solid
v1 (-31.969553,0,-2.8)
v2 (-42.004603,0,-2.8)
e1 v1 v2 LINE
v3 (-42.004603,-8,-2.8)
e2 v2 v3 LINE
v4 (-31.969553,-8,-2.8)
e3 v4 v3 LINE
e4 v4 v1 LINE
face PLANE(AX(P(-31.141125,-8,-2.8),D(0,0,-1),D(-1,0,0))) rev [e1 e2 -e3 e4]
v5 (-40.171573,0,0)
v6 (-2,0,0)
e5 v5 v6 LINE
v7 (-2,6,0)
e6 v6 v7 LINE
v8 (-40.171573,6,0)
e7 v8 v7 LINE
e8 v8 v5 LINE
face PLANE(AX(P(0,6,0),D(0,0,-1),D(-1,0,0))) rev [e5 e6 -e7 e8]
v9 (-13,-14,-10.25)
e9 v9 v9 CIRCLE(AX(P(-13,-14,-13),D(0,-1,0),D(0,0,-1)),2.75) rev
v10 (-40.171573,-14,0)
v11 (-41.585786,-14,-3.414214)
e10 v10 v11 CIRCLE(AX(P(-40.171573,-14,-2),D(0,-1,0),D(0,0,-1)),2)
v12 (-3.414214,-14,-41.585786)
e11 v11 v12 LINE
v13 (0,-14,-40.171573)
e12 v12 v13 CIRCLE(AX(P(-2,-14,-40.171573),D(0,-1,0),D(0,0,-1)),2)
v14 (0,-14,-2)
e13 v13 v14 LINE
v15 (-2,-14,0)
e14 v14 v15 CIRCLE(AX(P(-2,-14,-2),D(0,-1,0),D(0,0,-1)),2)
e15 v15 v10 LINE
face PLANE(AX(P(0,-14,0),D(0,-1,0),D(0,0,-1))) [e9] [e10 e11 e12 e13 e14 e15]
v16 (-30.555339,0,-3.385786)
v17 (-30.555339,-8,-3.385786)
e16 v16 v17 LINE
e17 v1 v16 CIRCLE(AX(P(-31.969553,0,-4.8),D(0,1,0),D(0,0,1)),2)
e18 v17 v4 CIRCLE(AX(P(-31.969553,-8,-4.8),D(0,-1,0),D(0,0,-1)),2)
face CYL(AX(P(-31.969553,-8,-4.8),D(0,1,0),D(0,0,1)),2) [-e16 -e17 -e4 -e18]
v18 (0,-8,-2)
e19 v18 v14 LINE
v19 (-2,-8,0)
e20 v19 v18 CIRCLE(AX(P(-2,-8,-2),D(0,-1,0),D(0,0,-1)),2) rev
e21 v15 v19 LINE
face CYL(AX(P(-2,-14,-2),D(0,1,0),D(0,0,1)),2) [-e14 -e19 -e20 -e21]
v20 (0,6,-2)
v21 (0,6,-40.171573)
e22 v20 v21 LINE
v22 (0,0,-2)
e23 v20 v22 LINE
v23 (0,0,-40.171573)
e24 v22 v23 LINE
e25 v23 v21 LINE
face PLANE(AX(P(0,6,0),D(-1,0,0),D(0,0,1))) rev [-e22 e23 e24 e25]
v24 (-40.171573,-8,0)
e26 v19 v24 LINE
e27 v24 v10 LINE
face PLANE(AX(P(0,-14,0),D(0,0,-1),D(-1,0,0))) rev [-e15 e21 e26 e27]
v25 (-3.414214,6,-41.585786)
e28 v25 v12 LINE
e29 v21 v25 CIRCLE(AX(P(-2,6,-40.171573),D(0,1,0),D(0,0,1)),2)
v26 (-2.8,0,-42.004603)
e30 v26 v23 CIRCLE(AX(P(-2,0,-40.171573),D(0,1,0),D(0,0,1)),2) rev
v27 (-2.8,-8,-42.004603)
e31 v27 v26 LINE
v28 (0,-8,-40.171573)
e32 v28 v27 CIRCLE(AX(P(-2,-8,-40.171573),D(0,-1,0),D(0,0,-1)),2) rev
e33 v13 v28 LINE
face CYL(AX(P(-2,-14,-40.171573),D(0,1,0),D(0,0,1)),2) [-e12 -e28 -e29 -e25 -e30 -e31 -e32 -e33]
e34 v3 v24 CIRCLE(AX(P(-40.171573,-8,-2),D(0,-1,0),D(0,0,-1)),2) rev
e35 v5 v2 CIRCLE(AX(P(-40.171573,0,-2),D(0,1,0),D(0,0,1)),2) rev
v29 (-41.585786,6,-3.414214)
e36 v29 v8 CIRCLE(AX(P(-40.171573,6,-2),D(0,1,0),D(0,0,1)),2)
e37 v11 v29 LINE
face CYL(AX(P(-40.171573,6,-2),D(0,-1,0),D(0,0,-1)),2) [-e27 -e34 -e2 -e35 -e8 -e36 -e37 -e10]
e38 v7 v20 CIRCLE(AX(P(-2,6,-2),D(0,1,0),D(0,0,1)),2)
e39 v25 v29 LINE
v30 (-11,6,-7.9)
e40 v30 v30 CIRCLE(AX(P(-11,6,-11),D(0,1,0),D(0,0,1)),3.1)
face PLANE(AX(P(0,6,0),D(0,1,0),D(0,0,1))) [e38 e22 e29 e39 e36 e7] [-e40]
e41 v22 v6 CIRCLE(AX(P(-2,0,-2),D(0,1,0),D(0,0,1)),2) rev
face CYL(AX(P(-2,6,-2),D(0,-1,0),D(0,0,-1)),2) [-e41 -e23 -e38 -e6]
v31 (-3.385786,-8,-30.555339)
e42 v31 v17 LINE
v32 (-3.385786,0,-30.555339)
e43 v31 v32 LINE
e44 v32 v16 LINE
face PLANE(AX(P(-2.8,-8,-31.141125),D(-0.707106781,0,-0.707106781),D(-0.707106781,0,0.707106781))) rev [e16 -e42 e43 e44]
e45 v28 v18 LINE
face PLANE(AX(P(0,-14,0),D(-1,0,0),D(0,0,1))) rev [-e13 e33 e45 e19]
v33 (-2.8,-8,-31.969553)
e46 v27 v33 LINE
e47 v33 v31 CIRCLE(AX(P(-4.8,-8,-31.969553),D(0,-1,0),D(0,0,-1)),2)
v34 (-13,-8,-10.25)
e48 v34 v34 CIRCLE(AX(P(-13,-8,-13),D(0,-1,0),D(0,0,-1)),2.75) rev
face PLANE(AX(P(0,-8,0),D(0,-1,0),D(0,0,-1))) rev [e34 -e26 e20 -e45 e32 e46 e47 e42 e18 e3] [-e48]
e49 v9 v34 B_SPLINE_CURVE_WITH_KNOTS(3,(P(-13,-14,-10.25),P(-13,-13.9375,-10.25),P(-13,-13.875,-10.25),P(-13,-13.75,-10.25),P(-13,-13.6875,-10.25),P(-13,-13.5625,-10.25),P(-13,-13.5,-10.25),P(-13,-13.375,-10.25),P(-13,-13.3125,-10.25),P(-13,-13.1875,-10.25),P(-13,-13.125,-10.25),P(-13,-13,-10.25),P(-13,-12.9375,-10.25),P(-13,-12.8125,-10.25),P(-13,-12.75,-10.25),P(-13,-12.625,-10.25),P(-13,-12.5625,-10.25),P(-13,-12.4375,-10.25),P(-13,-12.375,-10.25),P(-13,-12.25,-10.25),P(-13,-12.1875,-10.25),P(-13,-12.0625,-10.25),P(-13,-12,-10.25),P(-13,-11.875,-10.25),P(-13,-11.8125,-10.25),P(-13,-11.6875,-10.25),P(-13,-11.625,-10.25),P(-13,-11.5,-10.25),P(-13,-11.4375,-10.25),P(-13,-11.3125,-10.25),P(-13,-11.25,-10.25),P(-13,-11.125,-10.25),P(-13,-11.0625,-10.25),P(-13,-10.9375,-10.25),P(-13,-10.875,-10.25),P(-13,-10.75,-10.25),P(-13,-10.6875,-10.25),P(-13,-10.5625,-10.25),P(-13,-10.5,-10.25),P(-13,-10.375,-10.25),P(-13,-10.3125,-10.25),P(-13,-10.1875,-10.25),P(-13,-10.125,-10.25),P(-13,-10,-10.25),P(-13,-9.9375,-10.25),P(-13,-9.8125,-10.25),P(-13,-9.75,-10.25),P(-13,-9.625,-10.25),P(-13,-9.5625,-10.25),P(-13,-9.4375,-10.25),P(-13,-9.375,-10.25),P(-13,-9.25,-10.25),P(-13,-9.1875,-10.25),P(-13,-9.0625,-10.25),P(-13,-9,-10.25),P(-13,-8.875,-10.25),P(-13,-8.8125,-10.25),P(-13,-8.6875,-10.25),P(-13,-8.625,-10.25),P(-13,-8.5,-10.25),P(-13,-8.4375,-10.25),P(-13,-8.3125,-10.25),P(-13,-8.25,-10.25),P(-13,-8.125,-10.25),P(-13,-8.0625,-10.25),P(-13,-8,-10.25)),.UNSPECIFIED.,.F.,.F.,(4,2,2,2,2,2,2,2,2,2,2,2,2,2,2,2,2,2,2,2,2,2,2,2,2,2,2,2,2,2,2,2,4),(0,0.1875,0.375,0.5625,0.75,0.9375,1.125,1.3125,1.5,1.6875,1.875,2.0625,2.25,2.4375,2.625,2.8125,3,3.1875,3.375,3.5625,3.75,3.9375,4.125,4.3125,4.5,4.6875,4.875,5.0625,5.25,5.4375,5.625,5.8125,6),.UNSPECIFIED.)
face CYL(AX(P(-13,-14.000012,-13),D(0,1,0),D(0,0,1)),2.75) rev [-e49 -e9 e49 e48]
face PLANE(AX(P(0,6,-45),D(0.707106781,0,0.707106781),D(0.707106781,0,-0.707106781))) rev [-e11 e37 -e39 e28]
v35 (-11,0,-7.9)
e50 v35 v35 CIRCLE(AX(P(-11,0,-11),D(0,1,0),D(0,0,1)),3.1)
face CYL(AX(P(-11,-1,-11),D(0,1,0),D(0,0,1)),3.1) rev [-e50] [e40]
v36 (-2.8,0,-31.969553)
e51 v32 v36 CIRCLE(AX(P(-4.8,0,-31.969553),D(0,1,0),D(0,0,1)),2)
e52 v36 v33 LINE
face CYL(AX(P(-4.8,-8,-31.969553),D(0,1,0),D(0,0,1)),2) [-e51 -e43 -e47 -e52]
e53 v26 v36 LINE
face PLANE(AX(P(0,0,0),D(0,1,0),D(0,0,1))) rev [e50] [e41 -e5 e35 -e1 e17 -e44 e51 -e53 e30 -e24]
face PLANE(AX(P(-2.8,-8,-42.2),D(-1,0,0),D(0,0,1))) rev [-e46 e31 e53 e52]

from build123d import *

# Parameters (mm, degrees)
EXTRUDE_1_DEPTH          = 6
EXTRUDE_2_DEPTH          = 8
EXTRUDE_START            = -8
EXTRUDE_3_DEPTH          = 6
CUT_EXTRUDE_1_DEPTH      = 67.708320321
CUT_EXTRUDE_1_DEPTH_BACK = 8
SKETCH_3_R               = 2.75
FILLET_1_R               = 2
SKETCH_4_R               = 3.1
CUT_EXTRUDE_2_DEPTH      = 7


with BuildPart() as part:
    # 草图1 → 凸台-拉伸1 (new body)
    with BuildSketch(Plane(origin=(0, 0, 0), x_dir=(1, 0, 0), z_dir=(0, 1, 0))):
        Polygon((0, 0), (-45, 0), (0, 45), align=None)
    extrude(amount=EXTRUDE_1_DEPTH)

    # 草图2 → 凸台-拉伸2 (add)
    with BuildSketch(Plane.XZ):
        Polygon((-2.8, -42.2), (-2.8, -31.141125497), (-31.141125497, -2.8), (-42.2, -2.8), align=None)
    extrude(amount=EXTRUDE_2_DEPTH)

    # 草图1<3> → 凸台-拉伸3 (add)
    with BuildSketch(Plane(origin=(0, 0, 0), x_dir=(1, 0, 0), z_dir=(0, 1, 0)).offset(EXTRUDE_START)):
        Polygon((0, 0), (-45, 0), (0, 45), align=None)
    extrude(amount=-EXTRUDE_3_DEPTH)

    # 草图3 → 切除-拉伸1 (cut, two sides: drawn at the far end of the back side and taken through both)
    with BuildSketch(Plane.XZ.offset(14).offset(-CUT_EXTRUDE_1_DEPTH_BACK)):
        with Locations(Location((-13, -13, 0), (0, 0, 90))):
            Circle(SKETCH_3_R)
    extrude(amount=CUT_EXTRUDE_1_DEPTH + CUT_EXTRUDE_1_DEPTH_BACK, mode=Mode.SUBTRACT)

    # 圆角1
    # the kernel refuses this fillet: 2 mm, written as the material it takes off along each edge
    with BuildSketch(Plane(origin=(-2.8, 0, -31.141125497), x_dir=(0, 0, -1), z_dir=(0, -1, 0))) as fillet_1_piece_1:
        with BuildLine():
            CenterArc((FILLET_1_R * 0.414213562373, -FILLET_1_R), FILLET_1_R, 90, 45)
            Line((-FILLET_1_R * 0.292893218813, -FILLET_1_R * 0.292893218813), (0, 0))
            Line((0, 0), (FILLET_1_R * 0.414213562373, 0))
        make_face()
    extrude(amount=8, mode=Mode.SUBTRACT)
    with BuildSketch(Plane(origin=(-31.141125497, 0, -2.8), x_dir=(-1, 0, 0), z_dir=(0, -1, 0))) as fillet_1_piece_2:
        with BuildLine():
            CenterArc((FILLET_1_R * 0.414213562373, FILLET_1_R), FILLET_1_R, 225, 45)
            Line((-FILLET_1_R * 0.292893218813, FILLET_1_R * 0.292893218813), (0, 0))
            Line((0, 0), (FILLET_1_R * 0.414213562373, 0))
        make_face()
    extrude(amount=8, mode=Mode.SUBTRACT)
    with BuildSketch(Plane(origin=(-45, 4.071067812, 0), x_dir=(1, 0, 0), z_dir=(0, -1, 0)), Plane(origin=(-45, -12.071067812, 0), x_dir=(0.7071067811865471, 0, -0.7071067811865478), z_dir=(0, 1, 0))) as fillet_1_piece_3:
        with BuildLine():
            CenterArc((FILLET_1_R * 2.41421356237, -FILLET_1_R), FILLET_1_R, 90, 135)
            Line((FILLET_1_R * 1.70710678119, -FILLET_1_R * 1.70710678119), (0, 0))
            Line((0, 0), (FILLET_1_R * 2.41421356237, 0))
        make_face()
    extrude(amount=30.142135624, mode=Mode.SUBTRACT)
    with BuildSketch(Plane(origin=(0, 4.071067812, -45), x_dir=(0, 0, 1), z_dir=(0, -1, 0)), Plane(origin=(0, -12.071067812, -45), x_dir=(-0.7071067811865477, 0, 0.7071067811865474), z_dir=(0, 1, 0))) as fillet_1_piece_4:
        with BuildLine():
            CenterArc((FILLET_1_R * 2.41421356237, FILLET_1_R), FILLET_1_R, 135, 135)
            Line((FILLET_1_R * 1.70710678119, FILLET_1_R * 1.70710678119), (0, 0))
            Line((0, 0), (FILLET_1_R * 2.41421356237, 0))
        make_face()
    extrude(amount=30.142135624, mode=Mode.SUBTRACT)
    with BuildSketch(Plane(origin=(0, -3, 0), x_dir=(-1, 0, 0), z_dir=(0, -1, 0)), Plane(origin=(0, -5, 0), x_dir=(0, 0, -1), z_dir=(0, 1, 0))) as fillet_1_piece_5:
        with BuildLine():
            CenterArc((FILLET_1_R, FILLET_1_R), FILLET_1_R, 180, 90)
            Line((0, FILLET_1_R), (0, 0))
            Line((0, 0), (FILLET_1_R, 0))
        make_face()
    extrude(amount=16, mode=Mode.SUBTRACT)

    # 草图4 → 切除-拉伸2 (cut)
    with BuildSketch(Plane(origin=(0, 6, 0), x_dir=(1, 0, 0), z_dir=(0, 1, 0))):
        with Locations(Location((-11, 11, 0), (0, 0, 270))):
            Circle(SKETCH_4_R)
    extrude(amount=-CUT_EXTRUDE_2_DEPTH, mode=Mode.SUBTRACT)


solid = part.part
